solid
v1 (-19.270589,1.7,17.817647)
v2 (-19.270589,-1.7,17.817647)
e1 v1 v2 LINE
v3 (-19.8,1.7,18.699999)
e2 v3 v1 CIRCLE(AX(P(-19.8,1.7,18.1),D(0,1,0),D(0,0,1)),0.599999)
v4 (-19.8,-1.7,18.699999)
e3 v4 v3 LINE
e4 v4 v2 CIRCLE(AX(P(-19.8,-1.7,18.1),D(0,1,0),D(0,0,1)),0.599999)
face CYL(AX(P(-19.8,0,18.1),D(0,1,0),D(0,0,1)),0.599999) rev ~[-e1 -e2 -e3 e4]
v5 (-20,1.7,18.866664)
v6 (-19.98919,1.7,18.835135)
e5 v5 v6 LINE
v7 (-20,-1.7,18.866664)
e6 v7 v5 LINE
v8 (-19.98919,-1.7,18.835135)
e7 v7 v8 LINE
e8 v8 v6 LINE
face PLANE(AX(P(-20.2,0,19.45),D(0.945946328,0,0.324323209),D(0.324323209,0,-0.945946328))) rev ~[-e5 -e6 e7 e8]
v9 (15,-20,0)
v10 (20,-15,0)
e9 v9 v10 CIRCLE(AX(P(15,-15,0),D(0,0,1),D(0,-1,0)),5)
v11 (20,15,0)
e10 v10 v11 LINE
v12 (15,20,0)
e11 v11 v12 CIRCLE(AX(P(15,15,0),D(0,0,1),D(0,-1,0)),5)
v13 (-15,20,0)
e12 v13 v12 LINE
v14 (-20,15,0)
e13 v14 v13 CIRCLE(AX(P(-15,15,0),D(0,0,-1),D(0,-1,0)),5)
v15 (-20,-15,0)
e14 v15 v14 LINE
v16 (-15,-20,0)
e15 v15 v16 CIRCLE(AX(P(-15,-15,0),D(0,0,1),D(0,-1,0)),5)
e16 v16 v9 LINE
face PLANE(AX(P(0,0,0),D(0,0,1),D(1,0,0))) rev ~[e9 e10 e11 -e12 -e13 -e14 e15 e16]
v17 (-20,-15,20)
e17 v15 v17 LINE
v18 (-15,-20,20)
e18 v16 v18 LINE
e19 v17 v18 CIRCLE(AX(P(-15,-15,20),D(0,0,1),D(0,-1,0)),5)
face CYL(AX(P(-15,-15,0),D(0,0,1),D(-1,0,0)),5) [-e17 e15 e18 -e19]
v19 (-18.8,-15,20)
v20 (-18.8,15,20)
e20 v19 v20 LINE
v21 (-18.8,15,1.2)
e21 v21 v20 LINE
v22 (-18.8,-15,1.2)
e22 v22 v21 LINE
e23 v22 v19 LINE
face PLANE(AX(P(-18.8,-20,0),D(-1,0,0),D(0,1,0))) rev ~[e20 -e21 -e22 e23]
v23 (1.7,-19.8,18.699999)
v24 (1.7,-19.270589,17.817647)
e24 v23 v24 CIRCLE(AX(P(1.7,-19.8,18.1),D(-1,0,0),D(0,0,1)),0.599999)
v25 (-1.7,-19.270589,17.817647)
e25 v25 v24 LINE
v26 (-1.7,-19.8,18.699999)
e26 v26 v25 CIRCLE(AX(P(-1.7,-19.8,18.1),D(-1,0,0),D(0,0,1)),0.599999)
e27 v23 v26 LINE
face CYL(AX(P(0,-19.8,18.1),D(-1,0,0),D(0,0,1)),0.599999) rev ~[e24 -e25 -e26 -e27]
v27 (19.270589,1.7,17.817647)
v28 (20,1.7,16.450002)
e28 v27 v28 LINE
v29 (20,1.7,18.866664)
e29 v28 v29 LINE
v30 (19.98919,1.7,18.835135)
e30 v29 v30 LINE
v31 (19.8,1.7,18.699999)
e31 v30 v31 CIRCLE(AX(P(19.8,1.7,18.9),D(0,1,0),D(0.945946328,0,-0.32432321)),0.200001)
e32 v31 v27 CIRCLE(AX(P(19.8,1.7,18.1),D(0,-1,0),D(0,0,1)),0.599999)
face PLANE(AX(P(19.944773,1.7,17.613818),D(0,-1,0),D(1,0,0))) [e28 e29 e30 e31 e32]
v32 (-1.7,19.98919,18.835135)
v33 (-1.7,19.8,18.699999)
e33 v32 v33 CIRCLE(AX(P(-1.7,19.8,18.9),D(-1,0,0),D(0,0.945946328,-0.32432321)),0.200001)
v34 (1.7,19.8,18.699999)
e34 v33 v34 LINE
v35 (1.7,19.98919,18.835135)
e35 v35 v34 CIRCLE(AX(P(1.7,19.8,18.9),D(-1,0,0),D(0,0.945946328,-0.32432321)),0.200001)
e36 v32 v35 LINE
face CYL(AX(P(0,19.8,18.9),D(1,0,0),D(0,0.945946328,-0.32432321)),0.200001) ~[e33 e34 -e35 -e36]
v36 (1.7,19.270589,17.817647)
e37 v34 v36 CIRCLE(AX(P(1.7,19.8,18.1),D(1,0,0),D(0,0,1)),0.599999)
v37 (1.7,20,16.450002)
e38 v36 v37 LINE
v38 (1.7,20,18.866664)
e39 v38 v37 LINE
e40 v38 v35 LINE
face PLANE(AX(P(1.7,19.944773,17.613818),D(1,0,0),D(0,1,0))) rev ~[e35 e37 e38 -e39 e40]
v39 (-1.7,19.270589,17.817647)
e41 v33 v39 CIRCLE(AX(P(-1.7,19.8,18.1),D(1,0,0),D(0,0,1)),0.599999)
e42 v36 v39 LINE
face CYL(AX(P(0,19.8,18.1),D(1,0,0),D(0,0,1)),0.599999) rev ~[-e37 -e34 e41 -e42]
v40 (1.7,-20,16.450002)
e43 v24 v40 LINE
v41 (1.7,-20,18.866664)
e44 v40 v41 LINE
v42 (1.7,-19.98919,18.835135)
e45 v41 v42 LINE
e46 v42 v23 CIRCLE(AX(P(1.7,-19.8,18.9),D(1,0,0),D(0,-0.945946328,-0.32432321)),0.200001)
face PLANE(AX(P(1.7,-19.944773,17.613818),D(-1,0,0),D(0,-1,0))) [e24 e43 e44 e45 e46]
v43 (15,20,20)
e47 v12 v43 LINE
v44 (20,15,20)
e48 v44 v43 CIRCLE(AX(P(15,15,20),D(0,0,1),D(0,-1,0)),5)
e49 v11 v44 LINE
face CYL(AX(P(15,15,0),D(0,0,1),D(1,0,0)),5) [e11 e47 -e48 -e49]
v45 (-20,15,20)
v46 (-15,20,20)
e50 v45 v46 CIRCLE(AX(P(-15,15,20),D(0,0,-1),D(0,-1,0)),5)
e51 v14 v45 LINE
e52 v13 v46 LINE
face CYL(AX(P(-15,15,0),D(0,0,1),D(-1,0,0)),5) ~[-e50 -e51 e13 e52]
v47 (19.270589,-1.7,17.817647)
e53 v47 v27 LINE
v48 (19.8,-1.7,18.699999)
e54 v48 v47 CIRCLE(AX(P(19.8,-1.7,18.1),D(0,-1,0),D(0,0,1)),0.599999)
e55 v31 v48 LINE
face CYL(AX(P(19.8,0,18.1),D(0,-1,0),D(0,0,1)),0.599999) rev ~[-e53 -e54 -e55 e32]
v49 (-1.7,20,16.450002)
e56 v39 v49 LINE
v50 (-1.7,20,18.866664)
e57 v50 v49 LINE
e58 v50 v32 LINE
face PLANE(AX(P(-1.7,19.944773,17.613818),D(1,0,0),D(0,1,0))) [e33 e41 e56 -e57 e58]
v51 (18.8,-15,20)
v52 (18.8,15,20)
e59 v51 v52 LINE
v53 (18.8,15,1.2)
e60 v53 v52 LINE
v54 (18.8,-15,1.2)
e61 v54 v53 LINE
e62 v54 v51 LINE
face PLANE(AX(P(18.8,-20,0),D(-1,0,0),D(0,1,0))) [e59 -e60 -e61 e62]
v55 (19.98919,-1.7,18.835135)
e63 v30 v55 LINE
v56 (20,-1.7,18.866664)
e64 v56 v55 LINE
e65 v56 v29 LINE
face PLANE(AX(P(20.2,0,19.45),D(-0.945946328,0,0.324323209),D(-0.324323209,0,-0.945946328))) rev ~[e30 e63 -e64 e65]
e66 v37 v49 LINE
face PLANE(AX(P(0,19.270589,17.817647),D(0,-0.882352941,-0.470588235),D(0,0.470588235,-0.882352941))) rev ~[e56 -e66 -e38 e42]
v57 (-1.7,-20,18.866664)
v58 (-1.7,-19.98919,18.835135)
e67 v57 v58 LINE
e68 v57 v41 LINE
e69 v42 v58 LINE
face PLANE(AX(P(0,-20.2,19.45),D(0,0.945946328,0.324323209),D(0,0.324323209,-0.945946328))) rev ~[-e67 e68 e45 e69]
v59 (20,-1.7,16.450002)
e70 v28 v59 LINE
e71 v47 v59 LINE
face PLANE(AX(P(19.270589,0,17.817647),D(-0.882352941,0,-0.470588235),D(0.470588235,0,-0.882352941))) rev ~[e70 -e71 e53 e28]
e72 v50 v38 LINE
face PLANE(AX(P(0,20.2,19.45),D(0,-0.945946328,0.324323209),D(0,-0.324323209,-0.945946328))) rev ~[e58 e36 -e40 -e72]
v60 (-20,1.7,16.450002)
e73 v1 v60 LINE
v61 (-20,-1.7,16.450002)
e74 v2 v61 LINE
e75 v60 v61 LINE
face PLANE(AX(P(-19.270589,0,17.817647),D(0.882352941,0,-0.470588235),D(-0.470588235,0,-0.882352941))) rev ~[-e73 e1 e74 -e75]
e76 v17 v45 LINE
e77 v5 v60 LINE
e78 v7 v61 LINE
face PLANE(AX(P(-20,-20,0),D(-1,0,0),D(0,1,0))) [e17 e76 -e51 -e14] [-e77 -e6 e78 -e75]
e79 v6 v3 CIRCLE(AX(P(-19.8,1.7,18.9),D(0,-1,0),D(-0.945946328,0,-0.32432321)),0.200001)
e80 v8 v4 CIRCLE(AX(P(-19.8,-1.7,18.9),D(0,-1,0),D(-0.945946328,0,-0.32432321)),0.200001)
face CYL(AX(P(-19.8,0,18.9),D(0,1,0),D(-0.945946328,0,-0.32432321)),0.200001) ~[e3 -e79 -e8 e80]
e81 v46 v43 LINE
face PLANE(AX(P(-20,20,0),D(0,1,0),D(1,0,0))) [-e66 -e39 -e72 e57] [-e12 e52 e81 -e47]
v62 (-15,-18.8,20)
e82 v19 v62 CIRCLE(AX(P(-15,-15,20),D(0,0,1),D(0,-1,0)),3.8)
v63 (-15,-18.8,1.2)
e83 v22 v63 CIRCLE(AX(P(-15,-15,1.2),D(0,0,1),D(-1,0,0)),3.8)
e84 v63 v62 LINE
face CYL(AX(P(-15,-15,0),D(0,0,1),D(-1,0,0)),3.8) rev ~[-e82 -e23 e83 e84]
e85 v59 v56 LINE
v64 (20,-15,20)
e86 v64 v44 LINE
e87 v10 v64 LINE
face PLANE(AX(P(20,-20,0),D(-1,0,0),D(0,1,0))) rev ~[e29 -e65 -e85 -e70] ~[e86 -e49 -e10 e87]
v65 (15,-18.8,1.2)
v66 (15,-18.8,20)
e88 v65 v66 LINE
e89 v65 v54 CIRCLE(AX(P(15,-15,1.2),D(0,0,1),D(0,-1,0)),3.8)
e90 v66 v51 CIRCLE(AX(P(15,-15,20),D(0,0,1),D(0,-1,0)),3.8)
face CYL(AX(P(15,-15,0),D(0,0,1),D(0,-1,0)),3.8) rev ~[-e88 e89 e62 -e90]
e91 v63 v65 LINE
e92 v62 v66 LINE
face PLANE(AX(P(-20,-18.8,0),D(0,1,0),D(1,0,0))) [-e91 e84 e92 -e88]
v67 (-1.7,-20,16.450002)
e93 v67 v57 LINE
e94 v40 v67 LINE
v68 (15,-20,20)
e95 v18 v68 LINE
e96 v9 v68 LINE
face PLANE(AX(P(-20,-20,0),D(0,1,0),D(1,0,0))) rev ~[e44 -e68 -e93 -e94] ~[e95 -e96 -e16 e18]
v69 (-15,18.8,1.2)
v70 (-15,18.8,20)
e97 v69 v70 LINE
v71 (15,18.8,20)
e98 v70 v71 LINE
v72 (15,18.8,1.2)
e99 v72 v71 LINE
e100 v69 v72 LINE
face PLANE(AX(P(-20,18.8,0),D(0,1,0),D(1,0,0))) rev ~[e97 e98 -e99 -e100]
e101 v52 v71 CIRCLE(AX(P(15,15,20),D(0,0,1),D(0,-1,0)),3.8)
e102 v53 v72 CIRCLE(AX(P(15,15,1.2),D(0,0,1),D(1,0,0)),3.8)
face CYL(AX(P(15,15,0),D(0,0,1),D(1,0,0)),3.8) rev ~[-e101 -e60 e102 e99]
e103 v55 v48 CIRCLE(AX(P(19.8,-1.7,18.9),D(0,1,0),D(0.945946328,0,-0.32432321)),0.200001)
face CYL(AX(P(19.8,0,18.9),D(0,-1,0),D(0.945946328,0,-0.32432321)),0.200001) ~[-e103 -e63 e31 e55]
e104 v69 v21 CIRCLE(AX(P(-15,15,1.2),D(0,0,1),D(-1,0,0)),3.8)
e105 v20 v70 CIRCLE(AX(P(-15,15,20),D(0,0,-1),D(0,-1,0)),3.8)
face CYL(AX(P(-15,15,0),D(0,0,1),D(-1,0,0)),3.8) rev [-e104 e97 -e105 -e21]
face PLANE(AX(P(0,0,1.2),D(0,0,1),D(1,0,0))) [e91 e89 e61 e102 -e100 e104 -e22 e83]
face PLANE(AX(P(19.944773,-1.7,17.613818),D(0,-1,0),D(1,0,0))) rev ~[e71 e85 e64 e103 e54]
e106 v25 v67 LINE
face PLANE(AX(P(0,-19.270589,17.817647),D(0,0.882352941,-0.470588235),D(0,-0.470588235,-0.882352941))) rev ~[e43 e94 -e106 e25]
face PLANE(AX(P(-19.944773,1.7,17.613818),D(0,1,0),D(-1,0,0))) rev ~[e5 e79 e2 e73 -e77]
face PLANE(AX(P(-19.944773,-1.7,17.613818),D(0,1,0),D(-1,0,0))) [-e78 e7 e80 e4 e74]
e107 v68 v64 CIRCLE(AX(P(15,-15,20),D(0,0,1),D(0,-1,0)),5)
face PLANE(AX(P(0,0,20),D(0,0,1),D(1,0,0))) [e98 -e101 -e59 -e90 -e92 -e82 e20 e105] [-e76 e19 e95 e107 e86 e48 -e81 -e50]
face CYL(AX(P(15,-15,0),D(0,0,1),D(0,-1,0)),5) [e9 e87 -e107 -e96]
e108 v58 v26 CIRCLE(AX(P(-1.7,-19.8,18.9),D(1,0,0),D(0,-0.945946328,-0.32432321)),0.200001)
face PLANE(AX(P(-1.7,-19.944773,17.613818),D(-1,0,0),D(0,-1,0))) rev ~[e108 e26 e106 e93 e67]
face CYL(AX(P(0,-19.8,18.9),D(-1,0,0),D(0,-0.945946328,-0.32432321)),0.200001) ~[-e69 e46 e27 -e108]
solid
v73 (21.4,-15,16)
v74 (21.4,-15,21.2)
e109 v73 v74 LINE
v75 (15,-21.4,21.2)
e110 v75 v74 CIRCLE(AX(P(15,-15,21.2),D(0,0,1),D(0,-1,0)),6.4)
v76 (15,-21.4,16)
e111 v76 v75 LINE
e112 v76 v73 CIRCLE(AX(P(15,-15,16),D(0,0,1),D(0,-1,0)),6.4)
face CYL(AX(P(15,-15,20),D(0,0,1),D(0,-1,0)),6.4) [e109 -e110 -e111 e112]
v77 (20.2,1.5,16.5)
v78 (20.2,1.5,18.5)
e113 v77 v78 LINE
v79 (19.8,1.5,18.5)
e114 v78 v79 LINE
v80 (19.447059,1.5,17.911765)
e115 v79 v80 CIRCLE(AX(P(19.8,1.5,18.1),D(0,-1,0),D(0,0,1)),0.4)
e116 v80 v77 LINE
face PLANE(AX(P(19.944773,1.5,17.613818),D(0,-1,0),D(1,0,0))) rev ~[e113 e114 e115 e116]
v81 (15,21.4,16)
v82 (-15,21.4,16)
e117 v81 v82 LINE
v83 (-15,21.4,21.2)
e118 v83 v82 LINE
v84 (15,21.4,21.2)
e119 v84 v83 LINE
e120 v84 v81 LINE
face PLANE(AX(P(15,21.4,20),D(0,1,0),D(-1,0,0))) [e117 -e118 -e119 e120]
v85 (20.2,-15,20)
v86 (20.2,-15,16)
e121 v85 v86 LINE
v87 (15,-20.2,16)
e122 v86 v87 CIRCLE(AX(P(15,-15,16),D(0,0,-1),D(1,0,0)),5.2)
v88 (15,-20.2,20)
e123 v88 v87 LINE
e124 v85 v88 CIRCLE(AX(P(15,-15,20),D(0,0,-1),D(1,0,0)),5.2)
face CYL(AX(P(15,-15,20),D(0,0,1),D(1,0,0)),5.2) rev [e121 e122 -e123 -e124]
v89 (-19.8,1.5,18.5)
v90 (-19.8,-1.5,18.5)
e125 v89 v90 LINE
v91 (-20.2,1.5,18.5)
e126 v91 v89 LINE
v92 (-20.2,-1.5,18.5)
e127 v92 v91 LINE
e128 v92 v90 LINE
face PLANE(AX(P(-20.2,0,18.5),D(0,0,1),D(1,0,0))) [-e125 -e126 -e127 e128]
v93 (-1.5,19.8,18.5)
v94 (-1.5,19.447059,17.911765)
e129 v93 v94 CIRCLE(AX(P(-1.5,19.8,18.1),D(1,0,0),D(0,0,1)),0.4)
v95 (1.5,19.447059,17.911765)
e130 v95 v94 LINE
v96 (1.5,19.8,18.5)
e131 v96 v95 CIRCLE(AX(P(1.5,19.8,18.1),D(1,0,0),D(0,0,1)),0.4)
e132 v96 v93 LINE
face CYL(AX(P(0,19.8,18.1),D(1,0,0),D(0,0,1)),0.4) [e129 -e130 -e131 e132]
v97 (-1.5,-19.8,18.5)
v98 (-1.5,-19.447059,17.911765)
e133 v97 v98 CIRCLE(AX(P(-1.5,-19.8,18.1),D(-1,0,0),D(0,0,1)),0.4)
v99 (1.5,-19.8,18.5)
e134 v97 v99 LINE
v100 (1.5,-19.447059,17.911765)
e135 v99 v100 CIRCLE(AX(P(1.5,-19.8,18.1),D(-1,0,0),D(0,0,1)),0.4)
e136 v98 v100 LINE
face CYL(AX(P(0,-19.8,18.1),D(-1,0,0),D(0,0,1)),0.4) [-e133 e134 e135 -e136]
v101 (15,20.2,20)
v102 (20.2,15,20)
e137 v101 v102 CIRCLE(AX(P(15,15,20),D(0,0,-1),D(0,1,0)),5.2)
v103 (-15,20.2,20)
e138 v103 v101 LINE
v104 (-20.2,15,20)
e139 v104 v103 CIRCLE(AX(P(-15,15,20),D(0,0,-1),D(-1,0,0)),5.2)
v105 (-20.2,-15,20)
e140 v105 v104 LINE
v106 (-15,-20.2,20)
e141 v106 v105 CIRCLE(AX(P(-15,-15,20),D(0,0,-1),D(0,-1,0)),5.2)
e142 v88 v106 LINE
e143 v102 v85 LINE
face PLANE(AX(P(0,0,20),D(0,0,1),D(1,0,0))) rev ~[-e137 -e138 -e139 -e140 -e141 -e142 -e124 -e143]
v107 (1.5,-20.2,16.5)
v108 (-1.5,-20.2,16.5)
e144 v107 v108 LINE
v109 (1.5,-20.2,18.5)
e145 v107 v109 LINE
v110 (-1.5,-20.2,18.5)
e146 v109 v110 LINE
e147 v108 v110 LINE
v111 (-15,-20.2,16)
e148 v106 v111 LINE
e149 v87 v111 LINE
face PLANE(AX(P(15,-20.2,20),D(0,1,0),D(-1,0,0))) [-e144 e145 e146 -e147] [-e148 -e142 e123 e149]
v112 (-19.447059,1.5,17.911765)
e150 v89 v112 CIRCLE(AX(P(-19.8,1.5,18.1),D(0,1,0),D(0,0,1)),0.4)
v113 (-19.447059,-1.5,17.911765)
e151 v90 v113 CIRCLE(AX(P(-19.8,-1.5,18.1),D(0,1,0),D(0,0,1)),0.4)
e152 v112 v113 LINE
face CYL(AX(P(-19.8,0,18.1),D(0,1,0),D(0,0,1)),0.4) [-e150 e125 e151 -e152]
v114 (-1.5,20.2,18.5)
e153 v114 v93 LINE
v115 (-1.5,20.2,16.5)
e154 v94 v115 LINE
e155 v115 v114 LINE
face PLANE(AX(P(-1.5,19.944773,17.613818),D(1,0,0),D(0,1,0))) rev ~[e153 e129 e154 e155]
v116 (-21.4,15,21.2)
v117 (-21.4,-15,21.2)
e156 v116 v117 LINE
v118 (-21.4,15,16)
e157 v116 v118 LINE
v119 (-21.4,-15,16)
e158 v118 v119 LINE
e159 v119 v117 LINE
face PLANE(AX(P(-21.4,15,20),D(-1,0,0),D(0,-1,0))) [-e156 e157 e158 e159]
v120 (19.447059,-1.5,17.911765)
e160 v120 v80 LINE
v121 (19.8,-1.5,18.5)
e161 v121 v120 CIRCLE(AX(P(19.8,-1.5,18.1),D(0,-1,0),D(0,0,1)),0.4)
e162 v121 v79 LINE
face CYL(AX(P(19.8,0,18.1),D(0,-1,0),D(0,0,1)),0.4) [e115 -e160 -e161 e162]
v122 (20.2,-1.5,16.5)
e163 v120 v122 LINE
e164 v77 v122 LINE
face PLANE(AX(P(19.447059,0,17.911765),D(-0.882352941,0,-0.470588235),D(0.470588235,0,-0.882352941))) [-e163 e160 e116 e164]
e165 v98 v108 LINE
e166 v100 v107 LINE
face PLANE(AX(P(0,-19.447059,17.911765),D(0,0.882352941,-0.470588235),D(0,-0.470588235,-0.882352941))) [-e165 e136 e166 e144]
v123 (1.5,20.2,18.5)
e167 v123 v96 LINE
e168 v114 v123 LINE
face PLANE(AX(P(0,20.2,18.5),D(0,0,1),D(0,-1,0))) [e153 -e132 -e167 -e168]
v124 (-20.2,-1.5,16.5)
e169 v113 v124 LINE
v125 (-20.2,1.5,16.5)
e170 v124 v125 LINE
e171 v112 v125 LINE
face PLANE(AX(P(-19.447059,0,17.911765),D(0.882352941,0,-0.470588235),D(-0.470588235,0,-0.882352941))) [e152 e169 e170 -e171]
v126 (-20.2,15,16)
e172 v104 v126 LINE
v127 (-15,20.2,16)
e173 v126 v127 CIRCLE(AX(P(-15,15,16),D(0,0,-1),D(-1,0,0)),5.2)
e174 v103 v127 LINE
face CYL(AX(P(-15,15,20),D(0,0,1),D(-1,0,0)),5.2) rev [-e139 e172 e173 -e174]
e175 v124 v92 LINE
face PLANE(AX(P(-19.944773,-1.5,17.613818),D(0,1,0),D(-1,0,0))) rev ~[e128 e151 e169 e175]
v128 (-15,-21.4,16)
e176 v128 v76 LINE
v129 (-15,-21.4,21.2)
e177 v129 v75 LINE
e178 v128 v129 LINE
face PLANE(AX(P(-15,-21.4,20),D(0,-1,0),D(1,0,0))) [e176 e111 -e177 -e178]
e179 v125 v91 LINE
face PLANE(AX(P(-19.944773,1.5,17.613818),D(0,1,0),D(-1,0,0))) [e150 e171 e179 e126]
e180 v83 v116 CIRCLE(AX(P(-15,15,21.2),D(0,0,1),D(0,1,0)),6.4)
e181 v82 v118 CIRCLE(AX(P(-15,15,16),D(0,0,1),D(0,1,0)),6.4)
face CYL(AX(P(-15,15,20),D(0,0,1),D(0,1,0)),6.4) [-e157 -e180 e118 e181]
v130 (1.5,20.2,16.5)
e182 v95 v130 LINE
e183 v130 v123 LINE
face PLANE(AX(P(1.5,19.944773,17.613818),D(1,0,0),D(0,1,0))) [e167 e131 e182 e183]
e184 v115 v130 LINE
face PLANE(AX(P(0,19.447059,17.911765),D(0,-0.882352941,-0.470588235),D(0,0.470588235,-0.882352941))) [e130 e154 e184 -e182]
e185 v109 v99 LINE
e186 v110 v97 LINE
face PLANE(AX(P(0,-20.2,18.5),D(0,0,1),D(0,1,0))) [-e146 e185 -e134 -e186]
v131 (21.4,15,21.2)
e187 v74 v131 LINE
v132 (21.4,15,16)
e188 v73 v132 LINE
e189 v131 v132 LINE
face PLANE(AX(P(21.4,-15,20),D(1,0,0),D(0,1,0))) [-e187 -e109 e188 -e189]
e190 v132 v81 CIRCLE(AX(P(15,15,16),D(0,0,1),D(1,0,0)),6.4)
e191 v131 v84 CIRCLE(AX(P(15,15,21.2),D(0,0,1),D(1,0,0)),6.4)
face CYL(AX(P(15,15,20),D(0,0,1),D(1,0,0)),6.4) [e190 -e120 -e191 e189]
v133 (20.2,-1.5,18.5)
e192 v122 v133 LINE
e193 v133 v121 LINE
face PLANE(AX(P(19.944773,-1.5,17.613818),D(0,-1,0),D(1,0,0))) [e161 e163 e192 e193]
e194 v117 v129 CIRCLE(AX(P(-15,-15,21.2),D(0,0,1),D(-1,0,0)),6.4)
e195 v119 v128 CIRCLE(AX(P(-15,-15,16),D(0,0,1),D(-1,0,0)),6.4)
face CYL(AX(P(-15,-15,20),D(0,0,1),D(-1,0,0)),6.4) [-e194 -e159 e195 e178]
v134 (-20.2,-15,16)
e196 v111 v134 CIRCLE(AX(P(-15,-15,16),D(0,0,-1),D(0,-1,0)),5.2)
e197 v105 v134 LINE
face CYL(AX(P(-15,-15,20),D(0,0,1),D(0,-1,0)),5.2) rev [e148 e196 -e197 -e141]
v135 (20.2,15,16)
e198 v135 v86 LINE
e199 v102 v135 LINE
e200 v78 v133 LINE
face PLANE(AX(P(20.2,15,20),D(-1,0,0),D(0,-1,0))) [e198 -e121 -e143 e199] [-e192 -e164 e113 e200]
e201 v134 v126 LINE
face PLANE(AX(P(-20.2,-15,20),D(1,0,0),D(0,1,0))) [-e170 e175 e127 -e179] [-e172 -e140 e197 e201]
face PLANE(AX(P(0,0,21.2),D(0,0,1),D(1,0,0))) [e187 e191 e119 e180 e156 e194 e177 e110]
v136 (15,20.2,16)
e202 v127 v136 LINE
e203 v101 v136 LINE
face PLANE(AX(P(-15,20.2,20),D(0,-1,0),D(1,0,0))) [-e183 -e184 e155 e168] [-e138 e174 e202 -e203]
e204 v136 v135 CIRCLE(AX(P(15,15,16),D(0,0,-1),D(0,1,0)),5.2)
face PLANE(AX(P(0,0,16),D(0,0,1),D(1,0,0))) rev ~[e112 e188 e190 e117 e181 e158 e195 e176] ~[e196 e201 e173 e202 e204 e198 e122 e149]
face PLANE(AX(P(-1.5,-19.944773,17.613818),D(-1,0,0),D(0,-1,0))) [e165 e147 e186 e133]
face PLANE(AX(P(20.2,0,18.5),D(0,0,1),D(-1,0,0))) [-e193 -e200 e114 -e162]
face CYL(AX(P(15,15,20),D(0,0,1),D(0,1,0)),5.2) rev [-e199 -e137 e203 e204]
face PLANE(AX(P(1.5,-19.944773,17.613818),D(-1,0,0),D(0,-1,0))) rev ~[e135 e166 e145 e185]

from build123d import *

# Parameters (mm, degrees)
F0_W            = 40
F0_H            = 40
F1_DEPTH        = 20
F2_R            = 5
F3_T            = -1.2
F5_DEPTH        = 1.2
F6_DEPTH        = 4
F8_DEPTH        = 1.7
F8_COPIES_COUNT = 4
F9_DEPTH        = 1.5
F9_COPIES_COUNT = 4


# Not quite as in the source:
# - a pattern or mirror of a feature is missing from the dataset's text; its kind, count and spacing are read off the source's solid


with BuildPart() as f1:
    # F0 (on Top) → F1 (new body)
    with BuildSketch(Plane.XY):
        Rectangle(F0_W, F0_H)
    extrude(amount=F1_DEPTH)

    # F2
    f2_edges = [f1.edges().sort_by_distance(p)[0] for p in [
        (20, -20, 10),
        (20, 20, 10),
        (-20, -20, 10),
        (-20, 20, 10),
    ]]
    fillet(f2_edges, radius=F2_R)

    # F3
    f3_openings = [f1.faces().sort_by_distance(p)[0] for p in [
        (0, 0, 20),
    ]]
    offset(amount=F3_T, openings=f3_openings)

    # F7 (on Front) → F8 (cut, symmetric)
    with BuildSketch(Plane.XZ):
        with BuildLine():
            Line((19.4470588235, 17.9117647059), (20.2, 16.5))
            Line((20.2, 16.5), (20.2, 18.5))
            Line((20.2, 18.5), (19.8, 18.5))
            ThreePointArc((19.8, 18.5), (19.4570028297, 18.3057983022), (19.4470588235, 17.9117647059))
        make_face()
        with BuildLine():
            Line((19.8, 18.5), (20.2, 18.5))
            Line((20.2, 18.5), (20.2, 18.9))
            ThreePointArc((20.2, 18.9), (20.0828427125, 18.6171572875), (19.8, 18.5))
        make_face()
        with BuildLine():
            Line((20.2, 16.0750016282), (20.2, 16.5))
            Line((20.2, 16.5), (19.4470588235, 17.9117647059))
            ThreePointArc((19.4470588235, 17.9117647059), (19.4570028297, 18.3057983022), (19.8, 18.5))
            ThreePointArc((19.8, 18.5), (20.0828427125, 18.6171572875), (20.2, 18.9))
            Line((20.2, 18.9), (20.2, 19.45))
            Line((20.2, 19.45), (19.9891899905, 18.8351351096))
            ThreePointArc((19.9891899905, 18.8351351096), (19.91624818, 18.7372527508), (19.8, 18.6999992338))
            ThreePointArc((19.8, 18.6999992338), (19.2855049016, 18.408697059), (19.2705889114, 17.8176474194))
            Line((19.2705889114, 17.8176474194), (20.2, 16.0750016282))
        make_face()
    f8 = extrude(amount=F8_DEPTH, both=True, mode=Mode.SUBTRACT)

    # F8_copies: F8 ×4 about axis
    f8_copies_axis = Axis((0, 0, 0), (0, 0, 1))
    for i in range(1, F8_COPIES_COUNT):
        add(f8.rotate(f8_copies_axis, i * 360 / F8_COPIES_COUNT), mode=Mode.SUBTRACT)


with BuildPart() as f5:
    # F4 (on face) → F5 (new body)
    with BuildSketch(Plane.XY.offset(20)):
        with BuildLine():
            Line((-21.4, 15), (-21.4, -15))
            ThreePointArc((-21.4, -15), (-19.5254833996, -19.5254833996), (-15, -21.4))
            Line((-15, -21.4), (15, -21.4))
            ThreePointArc((15, -21.4), (19.5254833996, -19.5254833996), (21.4, -15))
            Line((21.4, -15), (21.4, 15))
            ThreePointArc((21.4, 15), (19.5254833996, 19.5254833996), (15, 21.4))
            Line((15, 21.4), (-15, 21.4))
            ThreePointArc((-15, 21.4), (-19.5254833996, 19.5254833996), (-21.4, 15))
        make_face()
        with BuildLine():
            ThreePointArc((-15, -20.2), (-18.6769552622, -18.6769552622), (-20.2, -15))
            Line((-20.2, -15), (-20.2, 15))
            ThreePointArc((-20.2, 15), (-18.6769552622, 18.6769552622), (-15, 20.2))
            Line((-15, 20.2), (15, 20.2))
            ThreePointArc((15, 20.2), (18.6769552622, 18.6769552622), (20.2, 15))
            Line((20.2, 15), (20.2, -15))
            ThreePointArc((20.2, -15), (18.6769552622, -18.6769552622), (15, -20.2))
            Line((15, -20.2), (-15, -20.2))
        make_face(mode=Mode.SUBTRACT)
        with BuildLine():
            Line((-20.2, 15), (-20.2, -15))
            ThreePointArc((-20.2, -15), (-18.6769552622, -18.6769552622), (-15, -20.2))
            Line((-15, -20.2), (15, -20.2))
            ThreePointArc((15, -20.2), (18.6769552622, -18.6769552622), (20.2, -15))
            Line((20.2, -15), (20.2, 15))
            ThreePointArc((20.2, 15), (18.6769552622, 18.6769552622), (15, 20.2))
            Line((15, 20.2), (-15, 20.2))
            ThreePointArc((-15, 20.2), (-18.6769552622, 18.6769552622), (-20.2, 15))
        make_face()
        with BuildLine():
            Line((15, -20), (-15, -20))
            ThreePointArc((-15, -20), (-18.5355339059, -18.5355339059), (-20, -15))
            Line((-20, -15), (-20, 15))
            ThreePointArc((-20, 15), (-18.5355339059, 18.5355339059), (-15, 20))
            Line((-15, 20), (15, 20))
            ThreePointArc((15, 20), (18.5355339059, 18.5355339059), (20, 15))
            Line((20, 15), (20, -15))
            ThreePointArc((20, -15), (18.5355339059, -18.5355339059), (15, -20))
        make_face(mode=Mode.SUBTRACT)
        with BuildLine():
            ThreePointArc((-20, -15), (-18.5355339059, -18.5355339059), (-15, -20))
            Line((-15, -20), (15, -20))
            ThreePointArc((15, -20), (18.5355339059, -18.5355339059), (20, -15))
            Line((20, -15), (20, 15))
            ThreePointArc((20, 15), (18.5355339059, 18.5355339059), (15, 20))
            Line((15, 20), (-15, 20))
            ThreePointArc((-15, 20), (-18.5355339059, 18.5355339059), (-20, 15))
            Line((-20, 15), (-20, -15))
        make_face()
        with BuildLine():
            ThreePointArc((-18.8, 15), (-17.6870057685, 17.6870057685), (-15, 18.8))
            Line((-15, 18.8), (15, 18.8))
            ThreePointArc((15, 18.8), (17.6870057685, 17.6870057685), (18.8, 15))
            Line((18.8, 15), (18.8, -15))
            ThreePointArc((18.8, -15), (17.6870057685, -17.6870057685), (15, -18.8))
            Line((15, -18.8), (-15, -18.8))
            ThreePointArc((-15, -18.8), (-17.6870057685, -17.6870057685), (-18.8, -15))
            Line((-18.8, -15), (-18.8, 15))
        make_face(mode=Mode.SUBTRACT)
        with BuildLine():
            Line((15, 18.8), (-15, 18.8))
            ThreePointArc((-15, 18.8), (-17.6870057685, 17.6870057685), (-18.8, 15))
            Line((-18.8, 15), (-18.8, -15))
            ThreePointArc((-18.8, -15), (-17.6870057685, -17.6870057685), (-15, -18.8))
            Line((-15, -18.8), (15, -18.8))
            ThreePointArc((15, -18.8), (17.6870057685, -17.6870057685), (18.8, -15))
            Line((18.8, -15), (18.8, 15))
            ThreePointArc((18.8, 15), (17.6870057685, 17.6870057685), (15, 18.8))
        make_face()
    extrude(amount=F5_DEPTH)

    # F4 (on face) → F6 (join)
    with BuildSketch(Plane.XY.offset(20)):
        with BuildLine():
            Line((-21.4, 15), (-21.4, -15))
            ThreePointArc((-21.4, -15), (-19.5254833996, -19.5254833996), (-15, -21.4))
            Line((-15, -21.4), (15, -21.4))
            ThreePointArc((15, -21.4), (19.5254833996, -19.5254833996), (21.4, -15))
            Line((21.4, -15), (21.4, 15))
            ThreePointArc((21.4, 15), (19.5254833996, 19.5254833996), (15, 21.4))
            Line((15, 21.4), (-15, 21.4))
            ThreePointArc((-15, 21.4), (-19.5254833996, 19.5254833996), (-21.4, 15))
        make_face()
        with BuildLine():
            ThreePointArc((-15, -20.2), (-18.6769552622, -18.6769552622), (-20.2, -15))
            Line((-20.2, -15), (-20.2, 15))
            ThreePointArc((-20.2, 15), (-18.6769552622, 18.6769552622), (-15, 20.2))
            Line((-15, 20.2), (15, 20.2))
            ThreePointArc((15, 20.2), (18.6769552622, 18.6769552622), (20.2, 15))
            Line((20.2, 15), (20.2, -15))
            ThreePointArc((20.2, -15), (18.6769552622, -18.6769552622), (15, -20.2))
            Line((15, -20.2), (-15, -20.2))
        make_face(mode=Mode.SUBTRACT)
    extrude(amount=-F6_DEPTH)

    # F7 (on Front) → F9 (join, symmetric)
    with BuildSketch(Plane.XZ):
        with BuildLine():
            Line((19.4470588235, 17.9117647059), (20.2, 16.5))
            Line((20.2, 16.5), (20.2, 18.5))
            Line((20.2, 18.5), (19.8, 18.5))
            ThreePointArc((19.8, 18.5), (19.4570028297, 18.3057983022), (19.4470588235, 17.9117647059))
        make_face()
    f9 = extrude(amount=F9_DEPTH, both=True)

    # F9_copies: F9 ×4 about axis
    f9_copies_axis = Axis((0, 0, 0), (0, 0, 1))
    for i in range(1, F9_COPIES_COUNT):
        add(f9.rotate(f9_copies_axis, i * 360 / F9_COPIES_COUNT))


solid = Compound([f1.part, f5.part])
